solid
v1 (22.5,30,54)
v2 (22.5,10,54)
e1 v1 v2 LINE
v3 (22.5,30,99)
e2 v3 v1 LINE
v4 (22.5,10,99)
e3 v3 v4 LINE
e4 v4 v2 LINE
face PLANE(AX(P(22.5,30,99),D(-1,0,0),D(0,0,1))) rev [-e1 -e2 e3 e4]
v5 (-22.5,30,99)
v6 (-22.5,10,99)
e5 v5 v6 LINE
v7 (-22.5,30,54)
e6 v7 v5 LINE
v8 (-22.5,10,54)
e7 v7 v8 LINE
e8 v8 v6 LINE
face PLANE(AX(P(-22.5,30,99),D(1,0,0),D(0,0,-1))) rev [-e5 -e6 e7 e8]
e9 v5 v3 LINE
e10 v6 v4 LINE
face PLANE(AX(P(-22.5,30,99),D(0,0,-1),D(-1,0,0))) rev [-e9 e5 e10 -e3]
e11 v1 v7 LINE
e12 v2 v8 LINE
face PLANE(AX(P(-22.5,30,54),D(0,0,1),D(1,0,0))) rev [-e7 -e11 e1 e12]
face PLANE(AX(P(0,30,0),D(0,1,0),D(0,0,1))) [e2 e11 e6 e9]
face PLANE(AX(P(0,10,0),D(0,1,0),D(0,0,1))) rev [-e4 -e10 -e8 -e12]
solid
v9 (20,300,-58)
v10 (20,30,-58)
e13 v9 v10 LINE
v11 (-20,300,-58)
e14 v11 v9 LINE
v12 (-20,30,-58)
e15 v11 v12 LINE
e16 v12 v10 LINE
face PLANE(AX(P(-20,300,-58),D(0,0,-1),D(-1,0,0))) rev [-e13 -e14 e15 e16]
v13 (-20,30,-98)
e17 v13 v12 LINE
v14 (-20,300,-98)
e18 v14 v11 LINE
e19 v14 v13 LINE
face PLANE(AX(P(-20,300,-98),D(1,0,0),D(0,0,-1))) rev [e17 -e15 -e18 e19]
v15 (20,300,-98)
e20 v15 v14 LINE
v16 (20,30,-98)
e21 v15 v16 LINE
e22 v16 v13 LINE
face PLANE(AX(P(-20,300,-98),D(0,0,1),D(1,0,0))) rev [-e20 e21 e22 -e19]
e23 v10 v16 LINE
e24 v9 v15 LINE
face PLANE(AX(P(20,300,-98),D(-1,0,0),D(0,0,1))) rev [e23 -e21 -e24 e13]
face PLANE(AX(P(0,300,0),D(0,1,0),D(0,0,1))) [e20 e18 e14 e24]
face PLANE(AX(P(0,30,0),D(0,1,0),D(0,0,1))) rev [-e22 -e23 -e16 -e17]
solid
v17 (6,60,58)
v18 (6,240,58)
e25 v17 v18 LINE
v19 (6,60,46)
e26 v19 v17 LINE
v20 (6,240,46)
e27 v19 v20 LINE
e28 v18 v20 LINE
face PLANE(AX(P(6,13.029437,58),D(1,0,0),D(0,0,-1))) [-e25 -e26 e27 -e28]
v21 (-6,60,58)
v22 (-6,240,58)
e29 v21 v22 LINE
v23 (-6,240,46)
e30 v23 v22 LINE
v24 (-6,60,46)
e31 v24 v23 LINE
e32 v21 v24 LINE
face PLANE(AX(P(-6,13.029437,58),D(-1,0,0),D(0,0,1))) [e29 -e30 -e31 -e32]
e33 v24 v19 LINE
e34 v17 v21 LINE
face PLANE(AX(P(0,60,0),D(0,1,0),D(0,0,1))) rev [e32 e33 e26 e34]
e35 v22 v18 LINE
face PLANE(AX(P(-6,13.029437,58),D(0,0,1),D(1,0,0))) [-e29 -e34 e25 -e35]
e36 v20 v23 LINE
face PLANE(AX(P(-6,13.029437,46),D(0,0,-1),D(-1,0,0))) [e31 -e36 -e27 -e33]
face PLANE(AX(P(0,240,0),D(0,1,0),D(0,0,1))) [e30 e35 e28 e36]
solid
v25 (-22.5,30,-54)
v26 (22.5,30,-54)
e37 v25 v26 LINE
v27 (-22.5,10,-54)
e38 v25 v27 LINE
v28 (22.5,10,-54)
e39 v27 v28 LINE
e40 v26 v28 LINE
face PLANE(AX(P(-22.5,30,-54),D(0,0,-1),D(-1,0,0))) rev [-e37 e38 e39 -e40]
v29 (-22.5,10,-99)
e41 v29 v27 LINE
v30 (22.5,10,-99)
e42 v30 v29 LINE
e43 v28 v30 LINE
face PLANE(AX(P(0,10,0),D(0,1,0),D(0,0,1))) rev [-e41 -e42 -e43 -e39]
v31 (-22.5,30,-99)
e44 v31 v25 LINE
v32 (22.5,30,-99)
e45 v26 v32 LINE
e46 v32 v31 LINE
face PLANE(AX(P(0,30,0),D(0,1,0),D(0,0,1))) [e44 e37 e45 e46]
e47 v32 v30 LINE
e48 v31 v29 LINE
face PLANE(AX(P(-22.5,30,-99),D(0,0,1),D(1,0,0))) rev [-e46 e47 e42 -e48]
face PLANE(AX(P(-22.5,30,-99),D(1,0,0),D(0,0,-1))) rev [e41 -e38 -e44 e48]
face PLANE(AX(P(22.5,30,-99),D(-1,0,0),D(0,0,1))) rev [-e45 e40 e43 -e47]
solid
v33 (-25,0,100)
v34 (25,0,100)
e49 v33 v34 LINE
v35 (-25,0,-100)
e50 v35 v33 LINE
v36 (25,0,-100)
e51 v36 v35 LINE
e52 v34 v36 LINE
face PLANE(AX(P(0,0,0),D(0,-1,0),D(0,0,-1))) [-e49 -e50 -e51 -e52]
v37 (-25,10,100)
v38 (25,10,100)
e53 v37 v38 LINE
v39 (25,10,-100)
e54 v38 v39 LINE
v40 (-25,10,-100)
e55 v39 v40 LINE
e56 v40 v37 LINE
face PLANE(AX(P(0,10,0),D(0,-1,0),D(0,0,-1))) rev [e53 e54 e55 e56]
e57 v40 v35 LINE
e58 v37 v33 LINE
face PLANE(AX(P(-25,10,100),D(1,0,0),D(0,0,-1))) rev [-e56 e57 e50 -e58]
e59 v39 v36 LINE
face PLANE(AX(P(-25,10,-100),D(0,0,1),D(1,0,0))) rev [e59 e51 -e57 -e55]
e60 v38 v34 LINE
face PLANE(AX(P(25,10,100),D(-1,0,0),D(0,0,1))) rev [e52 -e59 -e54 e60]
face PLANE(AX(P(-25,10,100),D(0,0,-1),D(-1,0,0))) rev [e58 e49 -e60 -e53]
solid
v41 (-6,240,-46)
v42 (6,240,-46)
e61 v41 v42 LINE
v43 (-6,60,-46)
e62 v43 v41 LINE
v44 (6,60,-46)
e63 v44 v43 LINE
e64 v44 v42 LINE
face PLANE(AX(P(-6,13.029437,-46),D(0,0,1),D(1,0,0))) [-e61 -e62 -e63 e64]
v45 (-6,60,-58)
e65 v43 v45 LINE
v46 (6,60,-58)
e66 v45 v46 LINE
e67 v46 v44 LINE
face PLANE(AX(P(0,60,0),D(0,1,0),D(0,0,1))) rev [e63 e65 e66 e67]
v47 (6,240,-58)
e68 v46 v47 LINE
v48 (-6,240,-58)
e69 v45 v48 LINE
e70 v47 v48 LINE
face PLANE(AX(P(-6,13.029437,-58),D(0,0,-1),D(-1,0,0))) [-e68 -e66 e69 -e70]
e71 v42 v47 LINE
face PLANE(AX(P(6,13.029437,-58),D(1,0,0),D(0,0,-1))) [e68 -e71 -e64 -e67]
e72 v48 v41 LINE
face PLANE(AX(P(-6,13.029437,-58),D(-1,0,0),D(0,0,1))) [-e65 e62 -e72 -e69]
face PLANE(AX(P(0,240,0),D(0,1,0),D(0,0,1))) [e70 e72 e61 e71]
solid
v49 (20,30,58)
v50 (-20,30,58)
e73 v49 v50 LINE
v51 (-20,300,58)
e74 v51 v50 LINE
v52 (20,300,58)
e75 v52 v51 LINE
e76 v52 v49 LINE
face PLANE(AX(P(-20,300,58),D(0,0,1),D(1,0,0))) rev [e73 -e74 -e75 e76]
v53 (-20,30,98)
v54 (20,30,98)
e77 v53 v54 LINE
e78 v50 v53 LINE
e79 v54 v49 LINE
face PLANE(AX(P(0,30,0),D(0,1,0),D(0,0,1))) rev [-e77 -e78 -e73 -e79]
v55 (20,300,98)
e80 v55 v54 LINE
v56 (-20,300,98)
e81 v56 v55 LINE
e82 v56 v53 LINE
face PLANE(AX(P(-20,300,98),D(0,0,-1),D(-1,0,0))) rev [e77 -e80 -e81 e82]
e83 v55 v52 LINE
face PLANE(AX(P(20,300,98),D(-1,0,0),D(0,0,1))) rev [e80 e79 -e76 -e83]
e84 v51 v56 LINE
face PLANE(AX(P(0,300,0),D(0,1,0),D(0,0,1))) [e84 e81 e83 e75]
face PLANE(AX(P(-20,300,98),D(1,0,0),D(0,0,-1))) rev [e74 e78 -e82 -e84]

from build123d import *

# Parameters (mm, degrees)
SKETCH1_W               = 50
SKETCH1_H               = 200
BOSS_EXTRUDE1_DEPTH     = 10
SKETCH2_W               = 45
SKETCH2_H               = 45
BOSS_EXTRUDE2_DEPTH     = 20
BOSS_EXTRUDE2_2_DEPTH   = 20
SKETCH3_W               = 40
SKETCH3_H               = 40
BOSS_EXTRUDE3_DEPTH     = 270
BOSS_EXTRUDE3_2_DEPTH   = 270
BOSS_EXTRUDE4_START     = -240
BOSS_EXTRUDE4_OUTLINE_W = 12
BOSS_EXTRUDE4_OUTLINE_H = 12
BOSS_EXTRUDE4_DEPTH     = 180


# Read off the part's stored shape, not the designer's step: Boss-Extrude4
with BuildPart() as part:
    # Sketch1 → Boss-Extrude1 (new body)
    with BuildSketch(Plane(origin=(0, 0, 0), x_dir=(1, 0, 0), z_dir=(0, 1, 0))):
        Rectangle(SKETCH1_W, SKETCH1_H)
    extrude(amount=BOSS_EXTRUDE1_DEPTH)


with BuildPart() as body_2:
    # Sketch2 → Boss-Extrude2 (new body)
    with BuildSketch(Plane(origin=(0, 10, 0), x_dir=(1, 0, 0), z_dir=(0, 1, 0))):
        with Locations((0, 76.5)):
            Rectangle(SKETCH2_W, SKETCH2_H)
    extrude(amount=BOSS_EXTRUDE2_DEPTH)


with BuildPart() as body_3:
    # Sketch2 → Boss-Extrude2 2 (new body)
    with BuildSketch(Plane(origin=(0, 10, 0), x_dir=(1, 0, 0), z_dir=(0, 1, 0))):
        with Locations((0, -76.5)):
            Rectangle(SKETCH2_W, SKETCH2_H)
    extrude(amount=BOSS_EXTRUDE2_2_DEPTH)


with BuildPart() as body_4:
    # Sketch3 → Boss-Extrude3 (new body)
    with BuildSketch(Plane(origin=(0, 30, 0), x_dir=(1, 0, 0), z_dir=(0, 1, 0))):
        with Locations((0, 78)):
            Rectangle(SKETCH3_W, SKETCH3_H)
    extrude(amount=BOSS_EXTRUDE3_DEPTH)


with BuildPart() as body_5:
    # Sketch3 → Boss-Extrude3 2 (new body)
    with BuildSketch(Plane(origin=(0, 30, 0), x_dir=(1, 0, 0), z_dir=(0, 1, 0))):
        with Locations((0, -78)):
            Rectangle(SKETCH3_W, SKETCH3_H)
    extrude(amount=BOSS_EXTRUDE3_2_DEPTH)


with BuildPart() as body_6:
    # Boss-Extrude4 outline → Boss-Extrude4 (new body)
    with BuildSketch(Plane(origin=(0, 300, 0), x_dir=(1, 0, 0), z_dir=(0, 1, 0)).offset(BOSS_EXTRUDE4_START)):
        with Locations((0, -52)):
            Rectangle(BOSS_EXTRUDE4_OUTLINE_W, BOSS_EXTRUDE4_OUTLINE_H)
        with Locations((0, 52)):
            Rectangle(BOSS_EXTRUDE4_OUTLINE_W, BOSS_EXTRUDE4_OUTLINE_H)
    extrude(amount=BOSS_EXTRUDE4_DEPTH)


solid = Compound([part.part, body_2.part, body_3.part, body_4.part, body_5.part, body_6.part])
